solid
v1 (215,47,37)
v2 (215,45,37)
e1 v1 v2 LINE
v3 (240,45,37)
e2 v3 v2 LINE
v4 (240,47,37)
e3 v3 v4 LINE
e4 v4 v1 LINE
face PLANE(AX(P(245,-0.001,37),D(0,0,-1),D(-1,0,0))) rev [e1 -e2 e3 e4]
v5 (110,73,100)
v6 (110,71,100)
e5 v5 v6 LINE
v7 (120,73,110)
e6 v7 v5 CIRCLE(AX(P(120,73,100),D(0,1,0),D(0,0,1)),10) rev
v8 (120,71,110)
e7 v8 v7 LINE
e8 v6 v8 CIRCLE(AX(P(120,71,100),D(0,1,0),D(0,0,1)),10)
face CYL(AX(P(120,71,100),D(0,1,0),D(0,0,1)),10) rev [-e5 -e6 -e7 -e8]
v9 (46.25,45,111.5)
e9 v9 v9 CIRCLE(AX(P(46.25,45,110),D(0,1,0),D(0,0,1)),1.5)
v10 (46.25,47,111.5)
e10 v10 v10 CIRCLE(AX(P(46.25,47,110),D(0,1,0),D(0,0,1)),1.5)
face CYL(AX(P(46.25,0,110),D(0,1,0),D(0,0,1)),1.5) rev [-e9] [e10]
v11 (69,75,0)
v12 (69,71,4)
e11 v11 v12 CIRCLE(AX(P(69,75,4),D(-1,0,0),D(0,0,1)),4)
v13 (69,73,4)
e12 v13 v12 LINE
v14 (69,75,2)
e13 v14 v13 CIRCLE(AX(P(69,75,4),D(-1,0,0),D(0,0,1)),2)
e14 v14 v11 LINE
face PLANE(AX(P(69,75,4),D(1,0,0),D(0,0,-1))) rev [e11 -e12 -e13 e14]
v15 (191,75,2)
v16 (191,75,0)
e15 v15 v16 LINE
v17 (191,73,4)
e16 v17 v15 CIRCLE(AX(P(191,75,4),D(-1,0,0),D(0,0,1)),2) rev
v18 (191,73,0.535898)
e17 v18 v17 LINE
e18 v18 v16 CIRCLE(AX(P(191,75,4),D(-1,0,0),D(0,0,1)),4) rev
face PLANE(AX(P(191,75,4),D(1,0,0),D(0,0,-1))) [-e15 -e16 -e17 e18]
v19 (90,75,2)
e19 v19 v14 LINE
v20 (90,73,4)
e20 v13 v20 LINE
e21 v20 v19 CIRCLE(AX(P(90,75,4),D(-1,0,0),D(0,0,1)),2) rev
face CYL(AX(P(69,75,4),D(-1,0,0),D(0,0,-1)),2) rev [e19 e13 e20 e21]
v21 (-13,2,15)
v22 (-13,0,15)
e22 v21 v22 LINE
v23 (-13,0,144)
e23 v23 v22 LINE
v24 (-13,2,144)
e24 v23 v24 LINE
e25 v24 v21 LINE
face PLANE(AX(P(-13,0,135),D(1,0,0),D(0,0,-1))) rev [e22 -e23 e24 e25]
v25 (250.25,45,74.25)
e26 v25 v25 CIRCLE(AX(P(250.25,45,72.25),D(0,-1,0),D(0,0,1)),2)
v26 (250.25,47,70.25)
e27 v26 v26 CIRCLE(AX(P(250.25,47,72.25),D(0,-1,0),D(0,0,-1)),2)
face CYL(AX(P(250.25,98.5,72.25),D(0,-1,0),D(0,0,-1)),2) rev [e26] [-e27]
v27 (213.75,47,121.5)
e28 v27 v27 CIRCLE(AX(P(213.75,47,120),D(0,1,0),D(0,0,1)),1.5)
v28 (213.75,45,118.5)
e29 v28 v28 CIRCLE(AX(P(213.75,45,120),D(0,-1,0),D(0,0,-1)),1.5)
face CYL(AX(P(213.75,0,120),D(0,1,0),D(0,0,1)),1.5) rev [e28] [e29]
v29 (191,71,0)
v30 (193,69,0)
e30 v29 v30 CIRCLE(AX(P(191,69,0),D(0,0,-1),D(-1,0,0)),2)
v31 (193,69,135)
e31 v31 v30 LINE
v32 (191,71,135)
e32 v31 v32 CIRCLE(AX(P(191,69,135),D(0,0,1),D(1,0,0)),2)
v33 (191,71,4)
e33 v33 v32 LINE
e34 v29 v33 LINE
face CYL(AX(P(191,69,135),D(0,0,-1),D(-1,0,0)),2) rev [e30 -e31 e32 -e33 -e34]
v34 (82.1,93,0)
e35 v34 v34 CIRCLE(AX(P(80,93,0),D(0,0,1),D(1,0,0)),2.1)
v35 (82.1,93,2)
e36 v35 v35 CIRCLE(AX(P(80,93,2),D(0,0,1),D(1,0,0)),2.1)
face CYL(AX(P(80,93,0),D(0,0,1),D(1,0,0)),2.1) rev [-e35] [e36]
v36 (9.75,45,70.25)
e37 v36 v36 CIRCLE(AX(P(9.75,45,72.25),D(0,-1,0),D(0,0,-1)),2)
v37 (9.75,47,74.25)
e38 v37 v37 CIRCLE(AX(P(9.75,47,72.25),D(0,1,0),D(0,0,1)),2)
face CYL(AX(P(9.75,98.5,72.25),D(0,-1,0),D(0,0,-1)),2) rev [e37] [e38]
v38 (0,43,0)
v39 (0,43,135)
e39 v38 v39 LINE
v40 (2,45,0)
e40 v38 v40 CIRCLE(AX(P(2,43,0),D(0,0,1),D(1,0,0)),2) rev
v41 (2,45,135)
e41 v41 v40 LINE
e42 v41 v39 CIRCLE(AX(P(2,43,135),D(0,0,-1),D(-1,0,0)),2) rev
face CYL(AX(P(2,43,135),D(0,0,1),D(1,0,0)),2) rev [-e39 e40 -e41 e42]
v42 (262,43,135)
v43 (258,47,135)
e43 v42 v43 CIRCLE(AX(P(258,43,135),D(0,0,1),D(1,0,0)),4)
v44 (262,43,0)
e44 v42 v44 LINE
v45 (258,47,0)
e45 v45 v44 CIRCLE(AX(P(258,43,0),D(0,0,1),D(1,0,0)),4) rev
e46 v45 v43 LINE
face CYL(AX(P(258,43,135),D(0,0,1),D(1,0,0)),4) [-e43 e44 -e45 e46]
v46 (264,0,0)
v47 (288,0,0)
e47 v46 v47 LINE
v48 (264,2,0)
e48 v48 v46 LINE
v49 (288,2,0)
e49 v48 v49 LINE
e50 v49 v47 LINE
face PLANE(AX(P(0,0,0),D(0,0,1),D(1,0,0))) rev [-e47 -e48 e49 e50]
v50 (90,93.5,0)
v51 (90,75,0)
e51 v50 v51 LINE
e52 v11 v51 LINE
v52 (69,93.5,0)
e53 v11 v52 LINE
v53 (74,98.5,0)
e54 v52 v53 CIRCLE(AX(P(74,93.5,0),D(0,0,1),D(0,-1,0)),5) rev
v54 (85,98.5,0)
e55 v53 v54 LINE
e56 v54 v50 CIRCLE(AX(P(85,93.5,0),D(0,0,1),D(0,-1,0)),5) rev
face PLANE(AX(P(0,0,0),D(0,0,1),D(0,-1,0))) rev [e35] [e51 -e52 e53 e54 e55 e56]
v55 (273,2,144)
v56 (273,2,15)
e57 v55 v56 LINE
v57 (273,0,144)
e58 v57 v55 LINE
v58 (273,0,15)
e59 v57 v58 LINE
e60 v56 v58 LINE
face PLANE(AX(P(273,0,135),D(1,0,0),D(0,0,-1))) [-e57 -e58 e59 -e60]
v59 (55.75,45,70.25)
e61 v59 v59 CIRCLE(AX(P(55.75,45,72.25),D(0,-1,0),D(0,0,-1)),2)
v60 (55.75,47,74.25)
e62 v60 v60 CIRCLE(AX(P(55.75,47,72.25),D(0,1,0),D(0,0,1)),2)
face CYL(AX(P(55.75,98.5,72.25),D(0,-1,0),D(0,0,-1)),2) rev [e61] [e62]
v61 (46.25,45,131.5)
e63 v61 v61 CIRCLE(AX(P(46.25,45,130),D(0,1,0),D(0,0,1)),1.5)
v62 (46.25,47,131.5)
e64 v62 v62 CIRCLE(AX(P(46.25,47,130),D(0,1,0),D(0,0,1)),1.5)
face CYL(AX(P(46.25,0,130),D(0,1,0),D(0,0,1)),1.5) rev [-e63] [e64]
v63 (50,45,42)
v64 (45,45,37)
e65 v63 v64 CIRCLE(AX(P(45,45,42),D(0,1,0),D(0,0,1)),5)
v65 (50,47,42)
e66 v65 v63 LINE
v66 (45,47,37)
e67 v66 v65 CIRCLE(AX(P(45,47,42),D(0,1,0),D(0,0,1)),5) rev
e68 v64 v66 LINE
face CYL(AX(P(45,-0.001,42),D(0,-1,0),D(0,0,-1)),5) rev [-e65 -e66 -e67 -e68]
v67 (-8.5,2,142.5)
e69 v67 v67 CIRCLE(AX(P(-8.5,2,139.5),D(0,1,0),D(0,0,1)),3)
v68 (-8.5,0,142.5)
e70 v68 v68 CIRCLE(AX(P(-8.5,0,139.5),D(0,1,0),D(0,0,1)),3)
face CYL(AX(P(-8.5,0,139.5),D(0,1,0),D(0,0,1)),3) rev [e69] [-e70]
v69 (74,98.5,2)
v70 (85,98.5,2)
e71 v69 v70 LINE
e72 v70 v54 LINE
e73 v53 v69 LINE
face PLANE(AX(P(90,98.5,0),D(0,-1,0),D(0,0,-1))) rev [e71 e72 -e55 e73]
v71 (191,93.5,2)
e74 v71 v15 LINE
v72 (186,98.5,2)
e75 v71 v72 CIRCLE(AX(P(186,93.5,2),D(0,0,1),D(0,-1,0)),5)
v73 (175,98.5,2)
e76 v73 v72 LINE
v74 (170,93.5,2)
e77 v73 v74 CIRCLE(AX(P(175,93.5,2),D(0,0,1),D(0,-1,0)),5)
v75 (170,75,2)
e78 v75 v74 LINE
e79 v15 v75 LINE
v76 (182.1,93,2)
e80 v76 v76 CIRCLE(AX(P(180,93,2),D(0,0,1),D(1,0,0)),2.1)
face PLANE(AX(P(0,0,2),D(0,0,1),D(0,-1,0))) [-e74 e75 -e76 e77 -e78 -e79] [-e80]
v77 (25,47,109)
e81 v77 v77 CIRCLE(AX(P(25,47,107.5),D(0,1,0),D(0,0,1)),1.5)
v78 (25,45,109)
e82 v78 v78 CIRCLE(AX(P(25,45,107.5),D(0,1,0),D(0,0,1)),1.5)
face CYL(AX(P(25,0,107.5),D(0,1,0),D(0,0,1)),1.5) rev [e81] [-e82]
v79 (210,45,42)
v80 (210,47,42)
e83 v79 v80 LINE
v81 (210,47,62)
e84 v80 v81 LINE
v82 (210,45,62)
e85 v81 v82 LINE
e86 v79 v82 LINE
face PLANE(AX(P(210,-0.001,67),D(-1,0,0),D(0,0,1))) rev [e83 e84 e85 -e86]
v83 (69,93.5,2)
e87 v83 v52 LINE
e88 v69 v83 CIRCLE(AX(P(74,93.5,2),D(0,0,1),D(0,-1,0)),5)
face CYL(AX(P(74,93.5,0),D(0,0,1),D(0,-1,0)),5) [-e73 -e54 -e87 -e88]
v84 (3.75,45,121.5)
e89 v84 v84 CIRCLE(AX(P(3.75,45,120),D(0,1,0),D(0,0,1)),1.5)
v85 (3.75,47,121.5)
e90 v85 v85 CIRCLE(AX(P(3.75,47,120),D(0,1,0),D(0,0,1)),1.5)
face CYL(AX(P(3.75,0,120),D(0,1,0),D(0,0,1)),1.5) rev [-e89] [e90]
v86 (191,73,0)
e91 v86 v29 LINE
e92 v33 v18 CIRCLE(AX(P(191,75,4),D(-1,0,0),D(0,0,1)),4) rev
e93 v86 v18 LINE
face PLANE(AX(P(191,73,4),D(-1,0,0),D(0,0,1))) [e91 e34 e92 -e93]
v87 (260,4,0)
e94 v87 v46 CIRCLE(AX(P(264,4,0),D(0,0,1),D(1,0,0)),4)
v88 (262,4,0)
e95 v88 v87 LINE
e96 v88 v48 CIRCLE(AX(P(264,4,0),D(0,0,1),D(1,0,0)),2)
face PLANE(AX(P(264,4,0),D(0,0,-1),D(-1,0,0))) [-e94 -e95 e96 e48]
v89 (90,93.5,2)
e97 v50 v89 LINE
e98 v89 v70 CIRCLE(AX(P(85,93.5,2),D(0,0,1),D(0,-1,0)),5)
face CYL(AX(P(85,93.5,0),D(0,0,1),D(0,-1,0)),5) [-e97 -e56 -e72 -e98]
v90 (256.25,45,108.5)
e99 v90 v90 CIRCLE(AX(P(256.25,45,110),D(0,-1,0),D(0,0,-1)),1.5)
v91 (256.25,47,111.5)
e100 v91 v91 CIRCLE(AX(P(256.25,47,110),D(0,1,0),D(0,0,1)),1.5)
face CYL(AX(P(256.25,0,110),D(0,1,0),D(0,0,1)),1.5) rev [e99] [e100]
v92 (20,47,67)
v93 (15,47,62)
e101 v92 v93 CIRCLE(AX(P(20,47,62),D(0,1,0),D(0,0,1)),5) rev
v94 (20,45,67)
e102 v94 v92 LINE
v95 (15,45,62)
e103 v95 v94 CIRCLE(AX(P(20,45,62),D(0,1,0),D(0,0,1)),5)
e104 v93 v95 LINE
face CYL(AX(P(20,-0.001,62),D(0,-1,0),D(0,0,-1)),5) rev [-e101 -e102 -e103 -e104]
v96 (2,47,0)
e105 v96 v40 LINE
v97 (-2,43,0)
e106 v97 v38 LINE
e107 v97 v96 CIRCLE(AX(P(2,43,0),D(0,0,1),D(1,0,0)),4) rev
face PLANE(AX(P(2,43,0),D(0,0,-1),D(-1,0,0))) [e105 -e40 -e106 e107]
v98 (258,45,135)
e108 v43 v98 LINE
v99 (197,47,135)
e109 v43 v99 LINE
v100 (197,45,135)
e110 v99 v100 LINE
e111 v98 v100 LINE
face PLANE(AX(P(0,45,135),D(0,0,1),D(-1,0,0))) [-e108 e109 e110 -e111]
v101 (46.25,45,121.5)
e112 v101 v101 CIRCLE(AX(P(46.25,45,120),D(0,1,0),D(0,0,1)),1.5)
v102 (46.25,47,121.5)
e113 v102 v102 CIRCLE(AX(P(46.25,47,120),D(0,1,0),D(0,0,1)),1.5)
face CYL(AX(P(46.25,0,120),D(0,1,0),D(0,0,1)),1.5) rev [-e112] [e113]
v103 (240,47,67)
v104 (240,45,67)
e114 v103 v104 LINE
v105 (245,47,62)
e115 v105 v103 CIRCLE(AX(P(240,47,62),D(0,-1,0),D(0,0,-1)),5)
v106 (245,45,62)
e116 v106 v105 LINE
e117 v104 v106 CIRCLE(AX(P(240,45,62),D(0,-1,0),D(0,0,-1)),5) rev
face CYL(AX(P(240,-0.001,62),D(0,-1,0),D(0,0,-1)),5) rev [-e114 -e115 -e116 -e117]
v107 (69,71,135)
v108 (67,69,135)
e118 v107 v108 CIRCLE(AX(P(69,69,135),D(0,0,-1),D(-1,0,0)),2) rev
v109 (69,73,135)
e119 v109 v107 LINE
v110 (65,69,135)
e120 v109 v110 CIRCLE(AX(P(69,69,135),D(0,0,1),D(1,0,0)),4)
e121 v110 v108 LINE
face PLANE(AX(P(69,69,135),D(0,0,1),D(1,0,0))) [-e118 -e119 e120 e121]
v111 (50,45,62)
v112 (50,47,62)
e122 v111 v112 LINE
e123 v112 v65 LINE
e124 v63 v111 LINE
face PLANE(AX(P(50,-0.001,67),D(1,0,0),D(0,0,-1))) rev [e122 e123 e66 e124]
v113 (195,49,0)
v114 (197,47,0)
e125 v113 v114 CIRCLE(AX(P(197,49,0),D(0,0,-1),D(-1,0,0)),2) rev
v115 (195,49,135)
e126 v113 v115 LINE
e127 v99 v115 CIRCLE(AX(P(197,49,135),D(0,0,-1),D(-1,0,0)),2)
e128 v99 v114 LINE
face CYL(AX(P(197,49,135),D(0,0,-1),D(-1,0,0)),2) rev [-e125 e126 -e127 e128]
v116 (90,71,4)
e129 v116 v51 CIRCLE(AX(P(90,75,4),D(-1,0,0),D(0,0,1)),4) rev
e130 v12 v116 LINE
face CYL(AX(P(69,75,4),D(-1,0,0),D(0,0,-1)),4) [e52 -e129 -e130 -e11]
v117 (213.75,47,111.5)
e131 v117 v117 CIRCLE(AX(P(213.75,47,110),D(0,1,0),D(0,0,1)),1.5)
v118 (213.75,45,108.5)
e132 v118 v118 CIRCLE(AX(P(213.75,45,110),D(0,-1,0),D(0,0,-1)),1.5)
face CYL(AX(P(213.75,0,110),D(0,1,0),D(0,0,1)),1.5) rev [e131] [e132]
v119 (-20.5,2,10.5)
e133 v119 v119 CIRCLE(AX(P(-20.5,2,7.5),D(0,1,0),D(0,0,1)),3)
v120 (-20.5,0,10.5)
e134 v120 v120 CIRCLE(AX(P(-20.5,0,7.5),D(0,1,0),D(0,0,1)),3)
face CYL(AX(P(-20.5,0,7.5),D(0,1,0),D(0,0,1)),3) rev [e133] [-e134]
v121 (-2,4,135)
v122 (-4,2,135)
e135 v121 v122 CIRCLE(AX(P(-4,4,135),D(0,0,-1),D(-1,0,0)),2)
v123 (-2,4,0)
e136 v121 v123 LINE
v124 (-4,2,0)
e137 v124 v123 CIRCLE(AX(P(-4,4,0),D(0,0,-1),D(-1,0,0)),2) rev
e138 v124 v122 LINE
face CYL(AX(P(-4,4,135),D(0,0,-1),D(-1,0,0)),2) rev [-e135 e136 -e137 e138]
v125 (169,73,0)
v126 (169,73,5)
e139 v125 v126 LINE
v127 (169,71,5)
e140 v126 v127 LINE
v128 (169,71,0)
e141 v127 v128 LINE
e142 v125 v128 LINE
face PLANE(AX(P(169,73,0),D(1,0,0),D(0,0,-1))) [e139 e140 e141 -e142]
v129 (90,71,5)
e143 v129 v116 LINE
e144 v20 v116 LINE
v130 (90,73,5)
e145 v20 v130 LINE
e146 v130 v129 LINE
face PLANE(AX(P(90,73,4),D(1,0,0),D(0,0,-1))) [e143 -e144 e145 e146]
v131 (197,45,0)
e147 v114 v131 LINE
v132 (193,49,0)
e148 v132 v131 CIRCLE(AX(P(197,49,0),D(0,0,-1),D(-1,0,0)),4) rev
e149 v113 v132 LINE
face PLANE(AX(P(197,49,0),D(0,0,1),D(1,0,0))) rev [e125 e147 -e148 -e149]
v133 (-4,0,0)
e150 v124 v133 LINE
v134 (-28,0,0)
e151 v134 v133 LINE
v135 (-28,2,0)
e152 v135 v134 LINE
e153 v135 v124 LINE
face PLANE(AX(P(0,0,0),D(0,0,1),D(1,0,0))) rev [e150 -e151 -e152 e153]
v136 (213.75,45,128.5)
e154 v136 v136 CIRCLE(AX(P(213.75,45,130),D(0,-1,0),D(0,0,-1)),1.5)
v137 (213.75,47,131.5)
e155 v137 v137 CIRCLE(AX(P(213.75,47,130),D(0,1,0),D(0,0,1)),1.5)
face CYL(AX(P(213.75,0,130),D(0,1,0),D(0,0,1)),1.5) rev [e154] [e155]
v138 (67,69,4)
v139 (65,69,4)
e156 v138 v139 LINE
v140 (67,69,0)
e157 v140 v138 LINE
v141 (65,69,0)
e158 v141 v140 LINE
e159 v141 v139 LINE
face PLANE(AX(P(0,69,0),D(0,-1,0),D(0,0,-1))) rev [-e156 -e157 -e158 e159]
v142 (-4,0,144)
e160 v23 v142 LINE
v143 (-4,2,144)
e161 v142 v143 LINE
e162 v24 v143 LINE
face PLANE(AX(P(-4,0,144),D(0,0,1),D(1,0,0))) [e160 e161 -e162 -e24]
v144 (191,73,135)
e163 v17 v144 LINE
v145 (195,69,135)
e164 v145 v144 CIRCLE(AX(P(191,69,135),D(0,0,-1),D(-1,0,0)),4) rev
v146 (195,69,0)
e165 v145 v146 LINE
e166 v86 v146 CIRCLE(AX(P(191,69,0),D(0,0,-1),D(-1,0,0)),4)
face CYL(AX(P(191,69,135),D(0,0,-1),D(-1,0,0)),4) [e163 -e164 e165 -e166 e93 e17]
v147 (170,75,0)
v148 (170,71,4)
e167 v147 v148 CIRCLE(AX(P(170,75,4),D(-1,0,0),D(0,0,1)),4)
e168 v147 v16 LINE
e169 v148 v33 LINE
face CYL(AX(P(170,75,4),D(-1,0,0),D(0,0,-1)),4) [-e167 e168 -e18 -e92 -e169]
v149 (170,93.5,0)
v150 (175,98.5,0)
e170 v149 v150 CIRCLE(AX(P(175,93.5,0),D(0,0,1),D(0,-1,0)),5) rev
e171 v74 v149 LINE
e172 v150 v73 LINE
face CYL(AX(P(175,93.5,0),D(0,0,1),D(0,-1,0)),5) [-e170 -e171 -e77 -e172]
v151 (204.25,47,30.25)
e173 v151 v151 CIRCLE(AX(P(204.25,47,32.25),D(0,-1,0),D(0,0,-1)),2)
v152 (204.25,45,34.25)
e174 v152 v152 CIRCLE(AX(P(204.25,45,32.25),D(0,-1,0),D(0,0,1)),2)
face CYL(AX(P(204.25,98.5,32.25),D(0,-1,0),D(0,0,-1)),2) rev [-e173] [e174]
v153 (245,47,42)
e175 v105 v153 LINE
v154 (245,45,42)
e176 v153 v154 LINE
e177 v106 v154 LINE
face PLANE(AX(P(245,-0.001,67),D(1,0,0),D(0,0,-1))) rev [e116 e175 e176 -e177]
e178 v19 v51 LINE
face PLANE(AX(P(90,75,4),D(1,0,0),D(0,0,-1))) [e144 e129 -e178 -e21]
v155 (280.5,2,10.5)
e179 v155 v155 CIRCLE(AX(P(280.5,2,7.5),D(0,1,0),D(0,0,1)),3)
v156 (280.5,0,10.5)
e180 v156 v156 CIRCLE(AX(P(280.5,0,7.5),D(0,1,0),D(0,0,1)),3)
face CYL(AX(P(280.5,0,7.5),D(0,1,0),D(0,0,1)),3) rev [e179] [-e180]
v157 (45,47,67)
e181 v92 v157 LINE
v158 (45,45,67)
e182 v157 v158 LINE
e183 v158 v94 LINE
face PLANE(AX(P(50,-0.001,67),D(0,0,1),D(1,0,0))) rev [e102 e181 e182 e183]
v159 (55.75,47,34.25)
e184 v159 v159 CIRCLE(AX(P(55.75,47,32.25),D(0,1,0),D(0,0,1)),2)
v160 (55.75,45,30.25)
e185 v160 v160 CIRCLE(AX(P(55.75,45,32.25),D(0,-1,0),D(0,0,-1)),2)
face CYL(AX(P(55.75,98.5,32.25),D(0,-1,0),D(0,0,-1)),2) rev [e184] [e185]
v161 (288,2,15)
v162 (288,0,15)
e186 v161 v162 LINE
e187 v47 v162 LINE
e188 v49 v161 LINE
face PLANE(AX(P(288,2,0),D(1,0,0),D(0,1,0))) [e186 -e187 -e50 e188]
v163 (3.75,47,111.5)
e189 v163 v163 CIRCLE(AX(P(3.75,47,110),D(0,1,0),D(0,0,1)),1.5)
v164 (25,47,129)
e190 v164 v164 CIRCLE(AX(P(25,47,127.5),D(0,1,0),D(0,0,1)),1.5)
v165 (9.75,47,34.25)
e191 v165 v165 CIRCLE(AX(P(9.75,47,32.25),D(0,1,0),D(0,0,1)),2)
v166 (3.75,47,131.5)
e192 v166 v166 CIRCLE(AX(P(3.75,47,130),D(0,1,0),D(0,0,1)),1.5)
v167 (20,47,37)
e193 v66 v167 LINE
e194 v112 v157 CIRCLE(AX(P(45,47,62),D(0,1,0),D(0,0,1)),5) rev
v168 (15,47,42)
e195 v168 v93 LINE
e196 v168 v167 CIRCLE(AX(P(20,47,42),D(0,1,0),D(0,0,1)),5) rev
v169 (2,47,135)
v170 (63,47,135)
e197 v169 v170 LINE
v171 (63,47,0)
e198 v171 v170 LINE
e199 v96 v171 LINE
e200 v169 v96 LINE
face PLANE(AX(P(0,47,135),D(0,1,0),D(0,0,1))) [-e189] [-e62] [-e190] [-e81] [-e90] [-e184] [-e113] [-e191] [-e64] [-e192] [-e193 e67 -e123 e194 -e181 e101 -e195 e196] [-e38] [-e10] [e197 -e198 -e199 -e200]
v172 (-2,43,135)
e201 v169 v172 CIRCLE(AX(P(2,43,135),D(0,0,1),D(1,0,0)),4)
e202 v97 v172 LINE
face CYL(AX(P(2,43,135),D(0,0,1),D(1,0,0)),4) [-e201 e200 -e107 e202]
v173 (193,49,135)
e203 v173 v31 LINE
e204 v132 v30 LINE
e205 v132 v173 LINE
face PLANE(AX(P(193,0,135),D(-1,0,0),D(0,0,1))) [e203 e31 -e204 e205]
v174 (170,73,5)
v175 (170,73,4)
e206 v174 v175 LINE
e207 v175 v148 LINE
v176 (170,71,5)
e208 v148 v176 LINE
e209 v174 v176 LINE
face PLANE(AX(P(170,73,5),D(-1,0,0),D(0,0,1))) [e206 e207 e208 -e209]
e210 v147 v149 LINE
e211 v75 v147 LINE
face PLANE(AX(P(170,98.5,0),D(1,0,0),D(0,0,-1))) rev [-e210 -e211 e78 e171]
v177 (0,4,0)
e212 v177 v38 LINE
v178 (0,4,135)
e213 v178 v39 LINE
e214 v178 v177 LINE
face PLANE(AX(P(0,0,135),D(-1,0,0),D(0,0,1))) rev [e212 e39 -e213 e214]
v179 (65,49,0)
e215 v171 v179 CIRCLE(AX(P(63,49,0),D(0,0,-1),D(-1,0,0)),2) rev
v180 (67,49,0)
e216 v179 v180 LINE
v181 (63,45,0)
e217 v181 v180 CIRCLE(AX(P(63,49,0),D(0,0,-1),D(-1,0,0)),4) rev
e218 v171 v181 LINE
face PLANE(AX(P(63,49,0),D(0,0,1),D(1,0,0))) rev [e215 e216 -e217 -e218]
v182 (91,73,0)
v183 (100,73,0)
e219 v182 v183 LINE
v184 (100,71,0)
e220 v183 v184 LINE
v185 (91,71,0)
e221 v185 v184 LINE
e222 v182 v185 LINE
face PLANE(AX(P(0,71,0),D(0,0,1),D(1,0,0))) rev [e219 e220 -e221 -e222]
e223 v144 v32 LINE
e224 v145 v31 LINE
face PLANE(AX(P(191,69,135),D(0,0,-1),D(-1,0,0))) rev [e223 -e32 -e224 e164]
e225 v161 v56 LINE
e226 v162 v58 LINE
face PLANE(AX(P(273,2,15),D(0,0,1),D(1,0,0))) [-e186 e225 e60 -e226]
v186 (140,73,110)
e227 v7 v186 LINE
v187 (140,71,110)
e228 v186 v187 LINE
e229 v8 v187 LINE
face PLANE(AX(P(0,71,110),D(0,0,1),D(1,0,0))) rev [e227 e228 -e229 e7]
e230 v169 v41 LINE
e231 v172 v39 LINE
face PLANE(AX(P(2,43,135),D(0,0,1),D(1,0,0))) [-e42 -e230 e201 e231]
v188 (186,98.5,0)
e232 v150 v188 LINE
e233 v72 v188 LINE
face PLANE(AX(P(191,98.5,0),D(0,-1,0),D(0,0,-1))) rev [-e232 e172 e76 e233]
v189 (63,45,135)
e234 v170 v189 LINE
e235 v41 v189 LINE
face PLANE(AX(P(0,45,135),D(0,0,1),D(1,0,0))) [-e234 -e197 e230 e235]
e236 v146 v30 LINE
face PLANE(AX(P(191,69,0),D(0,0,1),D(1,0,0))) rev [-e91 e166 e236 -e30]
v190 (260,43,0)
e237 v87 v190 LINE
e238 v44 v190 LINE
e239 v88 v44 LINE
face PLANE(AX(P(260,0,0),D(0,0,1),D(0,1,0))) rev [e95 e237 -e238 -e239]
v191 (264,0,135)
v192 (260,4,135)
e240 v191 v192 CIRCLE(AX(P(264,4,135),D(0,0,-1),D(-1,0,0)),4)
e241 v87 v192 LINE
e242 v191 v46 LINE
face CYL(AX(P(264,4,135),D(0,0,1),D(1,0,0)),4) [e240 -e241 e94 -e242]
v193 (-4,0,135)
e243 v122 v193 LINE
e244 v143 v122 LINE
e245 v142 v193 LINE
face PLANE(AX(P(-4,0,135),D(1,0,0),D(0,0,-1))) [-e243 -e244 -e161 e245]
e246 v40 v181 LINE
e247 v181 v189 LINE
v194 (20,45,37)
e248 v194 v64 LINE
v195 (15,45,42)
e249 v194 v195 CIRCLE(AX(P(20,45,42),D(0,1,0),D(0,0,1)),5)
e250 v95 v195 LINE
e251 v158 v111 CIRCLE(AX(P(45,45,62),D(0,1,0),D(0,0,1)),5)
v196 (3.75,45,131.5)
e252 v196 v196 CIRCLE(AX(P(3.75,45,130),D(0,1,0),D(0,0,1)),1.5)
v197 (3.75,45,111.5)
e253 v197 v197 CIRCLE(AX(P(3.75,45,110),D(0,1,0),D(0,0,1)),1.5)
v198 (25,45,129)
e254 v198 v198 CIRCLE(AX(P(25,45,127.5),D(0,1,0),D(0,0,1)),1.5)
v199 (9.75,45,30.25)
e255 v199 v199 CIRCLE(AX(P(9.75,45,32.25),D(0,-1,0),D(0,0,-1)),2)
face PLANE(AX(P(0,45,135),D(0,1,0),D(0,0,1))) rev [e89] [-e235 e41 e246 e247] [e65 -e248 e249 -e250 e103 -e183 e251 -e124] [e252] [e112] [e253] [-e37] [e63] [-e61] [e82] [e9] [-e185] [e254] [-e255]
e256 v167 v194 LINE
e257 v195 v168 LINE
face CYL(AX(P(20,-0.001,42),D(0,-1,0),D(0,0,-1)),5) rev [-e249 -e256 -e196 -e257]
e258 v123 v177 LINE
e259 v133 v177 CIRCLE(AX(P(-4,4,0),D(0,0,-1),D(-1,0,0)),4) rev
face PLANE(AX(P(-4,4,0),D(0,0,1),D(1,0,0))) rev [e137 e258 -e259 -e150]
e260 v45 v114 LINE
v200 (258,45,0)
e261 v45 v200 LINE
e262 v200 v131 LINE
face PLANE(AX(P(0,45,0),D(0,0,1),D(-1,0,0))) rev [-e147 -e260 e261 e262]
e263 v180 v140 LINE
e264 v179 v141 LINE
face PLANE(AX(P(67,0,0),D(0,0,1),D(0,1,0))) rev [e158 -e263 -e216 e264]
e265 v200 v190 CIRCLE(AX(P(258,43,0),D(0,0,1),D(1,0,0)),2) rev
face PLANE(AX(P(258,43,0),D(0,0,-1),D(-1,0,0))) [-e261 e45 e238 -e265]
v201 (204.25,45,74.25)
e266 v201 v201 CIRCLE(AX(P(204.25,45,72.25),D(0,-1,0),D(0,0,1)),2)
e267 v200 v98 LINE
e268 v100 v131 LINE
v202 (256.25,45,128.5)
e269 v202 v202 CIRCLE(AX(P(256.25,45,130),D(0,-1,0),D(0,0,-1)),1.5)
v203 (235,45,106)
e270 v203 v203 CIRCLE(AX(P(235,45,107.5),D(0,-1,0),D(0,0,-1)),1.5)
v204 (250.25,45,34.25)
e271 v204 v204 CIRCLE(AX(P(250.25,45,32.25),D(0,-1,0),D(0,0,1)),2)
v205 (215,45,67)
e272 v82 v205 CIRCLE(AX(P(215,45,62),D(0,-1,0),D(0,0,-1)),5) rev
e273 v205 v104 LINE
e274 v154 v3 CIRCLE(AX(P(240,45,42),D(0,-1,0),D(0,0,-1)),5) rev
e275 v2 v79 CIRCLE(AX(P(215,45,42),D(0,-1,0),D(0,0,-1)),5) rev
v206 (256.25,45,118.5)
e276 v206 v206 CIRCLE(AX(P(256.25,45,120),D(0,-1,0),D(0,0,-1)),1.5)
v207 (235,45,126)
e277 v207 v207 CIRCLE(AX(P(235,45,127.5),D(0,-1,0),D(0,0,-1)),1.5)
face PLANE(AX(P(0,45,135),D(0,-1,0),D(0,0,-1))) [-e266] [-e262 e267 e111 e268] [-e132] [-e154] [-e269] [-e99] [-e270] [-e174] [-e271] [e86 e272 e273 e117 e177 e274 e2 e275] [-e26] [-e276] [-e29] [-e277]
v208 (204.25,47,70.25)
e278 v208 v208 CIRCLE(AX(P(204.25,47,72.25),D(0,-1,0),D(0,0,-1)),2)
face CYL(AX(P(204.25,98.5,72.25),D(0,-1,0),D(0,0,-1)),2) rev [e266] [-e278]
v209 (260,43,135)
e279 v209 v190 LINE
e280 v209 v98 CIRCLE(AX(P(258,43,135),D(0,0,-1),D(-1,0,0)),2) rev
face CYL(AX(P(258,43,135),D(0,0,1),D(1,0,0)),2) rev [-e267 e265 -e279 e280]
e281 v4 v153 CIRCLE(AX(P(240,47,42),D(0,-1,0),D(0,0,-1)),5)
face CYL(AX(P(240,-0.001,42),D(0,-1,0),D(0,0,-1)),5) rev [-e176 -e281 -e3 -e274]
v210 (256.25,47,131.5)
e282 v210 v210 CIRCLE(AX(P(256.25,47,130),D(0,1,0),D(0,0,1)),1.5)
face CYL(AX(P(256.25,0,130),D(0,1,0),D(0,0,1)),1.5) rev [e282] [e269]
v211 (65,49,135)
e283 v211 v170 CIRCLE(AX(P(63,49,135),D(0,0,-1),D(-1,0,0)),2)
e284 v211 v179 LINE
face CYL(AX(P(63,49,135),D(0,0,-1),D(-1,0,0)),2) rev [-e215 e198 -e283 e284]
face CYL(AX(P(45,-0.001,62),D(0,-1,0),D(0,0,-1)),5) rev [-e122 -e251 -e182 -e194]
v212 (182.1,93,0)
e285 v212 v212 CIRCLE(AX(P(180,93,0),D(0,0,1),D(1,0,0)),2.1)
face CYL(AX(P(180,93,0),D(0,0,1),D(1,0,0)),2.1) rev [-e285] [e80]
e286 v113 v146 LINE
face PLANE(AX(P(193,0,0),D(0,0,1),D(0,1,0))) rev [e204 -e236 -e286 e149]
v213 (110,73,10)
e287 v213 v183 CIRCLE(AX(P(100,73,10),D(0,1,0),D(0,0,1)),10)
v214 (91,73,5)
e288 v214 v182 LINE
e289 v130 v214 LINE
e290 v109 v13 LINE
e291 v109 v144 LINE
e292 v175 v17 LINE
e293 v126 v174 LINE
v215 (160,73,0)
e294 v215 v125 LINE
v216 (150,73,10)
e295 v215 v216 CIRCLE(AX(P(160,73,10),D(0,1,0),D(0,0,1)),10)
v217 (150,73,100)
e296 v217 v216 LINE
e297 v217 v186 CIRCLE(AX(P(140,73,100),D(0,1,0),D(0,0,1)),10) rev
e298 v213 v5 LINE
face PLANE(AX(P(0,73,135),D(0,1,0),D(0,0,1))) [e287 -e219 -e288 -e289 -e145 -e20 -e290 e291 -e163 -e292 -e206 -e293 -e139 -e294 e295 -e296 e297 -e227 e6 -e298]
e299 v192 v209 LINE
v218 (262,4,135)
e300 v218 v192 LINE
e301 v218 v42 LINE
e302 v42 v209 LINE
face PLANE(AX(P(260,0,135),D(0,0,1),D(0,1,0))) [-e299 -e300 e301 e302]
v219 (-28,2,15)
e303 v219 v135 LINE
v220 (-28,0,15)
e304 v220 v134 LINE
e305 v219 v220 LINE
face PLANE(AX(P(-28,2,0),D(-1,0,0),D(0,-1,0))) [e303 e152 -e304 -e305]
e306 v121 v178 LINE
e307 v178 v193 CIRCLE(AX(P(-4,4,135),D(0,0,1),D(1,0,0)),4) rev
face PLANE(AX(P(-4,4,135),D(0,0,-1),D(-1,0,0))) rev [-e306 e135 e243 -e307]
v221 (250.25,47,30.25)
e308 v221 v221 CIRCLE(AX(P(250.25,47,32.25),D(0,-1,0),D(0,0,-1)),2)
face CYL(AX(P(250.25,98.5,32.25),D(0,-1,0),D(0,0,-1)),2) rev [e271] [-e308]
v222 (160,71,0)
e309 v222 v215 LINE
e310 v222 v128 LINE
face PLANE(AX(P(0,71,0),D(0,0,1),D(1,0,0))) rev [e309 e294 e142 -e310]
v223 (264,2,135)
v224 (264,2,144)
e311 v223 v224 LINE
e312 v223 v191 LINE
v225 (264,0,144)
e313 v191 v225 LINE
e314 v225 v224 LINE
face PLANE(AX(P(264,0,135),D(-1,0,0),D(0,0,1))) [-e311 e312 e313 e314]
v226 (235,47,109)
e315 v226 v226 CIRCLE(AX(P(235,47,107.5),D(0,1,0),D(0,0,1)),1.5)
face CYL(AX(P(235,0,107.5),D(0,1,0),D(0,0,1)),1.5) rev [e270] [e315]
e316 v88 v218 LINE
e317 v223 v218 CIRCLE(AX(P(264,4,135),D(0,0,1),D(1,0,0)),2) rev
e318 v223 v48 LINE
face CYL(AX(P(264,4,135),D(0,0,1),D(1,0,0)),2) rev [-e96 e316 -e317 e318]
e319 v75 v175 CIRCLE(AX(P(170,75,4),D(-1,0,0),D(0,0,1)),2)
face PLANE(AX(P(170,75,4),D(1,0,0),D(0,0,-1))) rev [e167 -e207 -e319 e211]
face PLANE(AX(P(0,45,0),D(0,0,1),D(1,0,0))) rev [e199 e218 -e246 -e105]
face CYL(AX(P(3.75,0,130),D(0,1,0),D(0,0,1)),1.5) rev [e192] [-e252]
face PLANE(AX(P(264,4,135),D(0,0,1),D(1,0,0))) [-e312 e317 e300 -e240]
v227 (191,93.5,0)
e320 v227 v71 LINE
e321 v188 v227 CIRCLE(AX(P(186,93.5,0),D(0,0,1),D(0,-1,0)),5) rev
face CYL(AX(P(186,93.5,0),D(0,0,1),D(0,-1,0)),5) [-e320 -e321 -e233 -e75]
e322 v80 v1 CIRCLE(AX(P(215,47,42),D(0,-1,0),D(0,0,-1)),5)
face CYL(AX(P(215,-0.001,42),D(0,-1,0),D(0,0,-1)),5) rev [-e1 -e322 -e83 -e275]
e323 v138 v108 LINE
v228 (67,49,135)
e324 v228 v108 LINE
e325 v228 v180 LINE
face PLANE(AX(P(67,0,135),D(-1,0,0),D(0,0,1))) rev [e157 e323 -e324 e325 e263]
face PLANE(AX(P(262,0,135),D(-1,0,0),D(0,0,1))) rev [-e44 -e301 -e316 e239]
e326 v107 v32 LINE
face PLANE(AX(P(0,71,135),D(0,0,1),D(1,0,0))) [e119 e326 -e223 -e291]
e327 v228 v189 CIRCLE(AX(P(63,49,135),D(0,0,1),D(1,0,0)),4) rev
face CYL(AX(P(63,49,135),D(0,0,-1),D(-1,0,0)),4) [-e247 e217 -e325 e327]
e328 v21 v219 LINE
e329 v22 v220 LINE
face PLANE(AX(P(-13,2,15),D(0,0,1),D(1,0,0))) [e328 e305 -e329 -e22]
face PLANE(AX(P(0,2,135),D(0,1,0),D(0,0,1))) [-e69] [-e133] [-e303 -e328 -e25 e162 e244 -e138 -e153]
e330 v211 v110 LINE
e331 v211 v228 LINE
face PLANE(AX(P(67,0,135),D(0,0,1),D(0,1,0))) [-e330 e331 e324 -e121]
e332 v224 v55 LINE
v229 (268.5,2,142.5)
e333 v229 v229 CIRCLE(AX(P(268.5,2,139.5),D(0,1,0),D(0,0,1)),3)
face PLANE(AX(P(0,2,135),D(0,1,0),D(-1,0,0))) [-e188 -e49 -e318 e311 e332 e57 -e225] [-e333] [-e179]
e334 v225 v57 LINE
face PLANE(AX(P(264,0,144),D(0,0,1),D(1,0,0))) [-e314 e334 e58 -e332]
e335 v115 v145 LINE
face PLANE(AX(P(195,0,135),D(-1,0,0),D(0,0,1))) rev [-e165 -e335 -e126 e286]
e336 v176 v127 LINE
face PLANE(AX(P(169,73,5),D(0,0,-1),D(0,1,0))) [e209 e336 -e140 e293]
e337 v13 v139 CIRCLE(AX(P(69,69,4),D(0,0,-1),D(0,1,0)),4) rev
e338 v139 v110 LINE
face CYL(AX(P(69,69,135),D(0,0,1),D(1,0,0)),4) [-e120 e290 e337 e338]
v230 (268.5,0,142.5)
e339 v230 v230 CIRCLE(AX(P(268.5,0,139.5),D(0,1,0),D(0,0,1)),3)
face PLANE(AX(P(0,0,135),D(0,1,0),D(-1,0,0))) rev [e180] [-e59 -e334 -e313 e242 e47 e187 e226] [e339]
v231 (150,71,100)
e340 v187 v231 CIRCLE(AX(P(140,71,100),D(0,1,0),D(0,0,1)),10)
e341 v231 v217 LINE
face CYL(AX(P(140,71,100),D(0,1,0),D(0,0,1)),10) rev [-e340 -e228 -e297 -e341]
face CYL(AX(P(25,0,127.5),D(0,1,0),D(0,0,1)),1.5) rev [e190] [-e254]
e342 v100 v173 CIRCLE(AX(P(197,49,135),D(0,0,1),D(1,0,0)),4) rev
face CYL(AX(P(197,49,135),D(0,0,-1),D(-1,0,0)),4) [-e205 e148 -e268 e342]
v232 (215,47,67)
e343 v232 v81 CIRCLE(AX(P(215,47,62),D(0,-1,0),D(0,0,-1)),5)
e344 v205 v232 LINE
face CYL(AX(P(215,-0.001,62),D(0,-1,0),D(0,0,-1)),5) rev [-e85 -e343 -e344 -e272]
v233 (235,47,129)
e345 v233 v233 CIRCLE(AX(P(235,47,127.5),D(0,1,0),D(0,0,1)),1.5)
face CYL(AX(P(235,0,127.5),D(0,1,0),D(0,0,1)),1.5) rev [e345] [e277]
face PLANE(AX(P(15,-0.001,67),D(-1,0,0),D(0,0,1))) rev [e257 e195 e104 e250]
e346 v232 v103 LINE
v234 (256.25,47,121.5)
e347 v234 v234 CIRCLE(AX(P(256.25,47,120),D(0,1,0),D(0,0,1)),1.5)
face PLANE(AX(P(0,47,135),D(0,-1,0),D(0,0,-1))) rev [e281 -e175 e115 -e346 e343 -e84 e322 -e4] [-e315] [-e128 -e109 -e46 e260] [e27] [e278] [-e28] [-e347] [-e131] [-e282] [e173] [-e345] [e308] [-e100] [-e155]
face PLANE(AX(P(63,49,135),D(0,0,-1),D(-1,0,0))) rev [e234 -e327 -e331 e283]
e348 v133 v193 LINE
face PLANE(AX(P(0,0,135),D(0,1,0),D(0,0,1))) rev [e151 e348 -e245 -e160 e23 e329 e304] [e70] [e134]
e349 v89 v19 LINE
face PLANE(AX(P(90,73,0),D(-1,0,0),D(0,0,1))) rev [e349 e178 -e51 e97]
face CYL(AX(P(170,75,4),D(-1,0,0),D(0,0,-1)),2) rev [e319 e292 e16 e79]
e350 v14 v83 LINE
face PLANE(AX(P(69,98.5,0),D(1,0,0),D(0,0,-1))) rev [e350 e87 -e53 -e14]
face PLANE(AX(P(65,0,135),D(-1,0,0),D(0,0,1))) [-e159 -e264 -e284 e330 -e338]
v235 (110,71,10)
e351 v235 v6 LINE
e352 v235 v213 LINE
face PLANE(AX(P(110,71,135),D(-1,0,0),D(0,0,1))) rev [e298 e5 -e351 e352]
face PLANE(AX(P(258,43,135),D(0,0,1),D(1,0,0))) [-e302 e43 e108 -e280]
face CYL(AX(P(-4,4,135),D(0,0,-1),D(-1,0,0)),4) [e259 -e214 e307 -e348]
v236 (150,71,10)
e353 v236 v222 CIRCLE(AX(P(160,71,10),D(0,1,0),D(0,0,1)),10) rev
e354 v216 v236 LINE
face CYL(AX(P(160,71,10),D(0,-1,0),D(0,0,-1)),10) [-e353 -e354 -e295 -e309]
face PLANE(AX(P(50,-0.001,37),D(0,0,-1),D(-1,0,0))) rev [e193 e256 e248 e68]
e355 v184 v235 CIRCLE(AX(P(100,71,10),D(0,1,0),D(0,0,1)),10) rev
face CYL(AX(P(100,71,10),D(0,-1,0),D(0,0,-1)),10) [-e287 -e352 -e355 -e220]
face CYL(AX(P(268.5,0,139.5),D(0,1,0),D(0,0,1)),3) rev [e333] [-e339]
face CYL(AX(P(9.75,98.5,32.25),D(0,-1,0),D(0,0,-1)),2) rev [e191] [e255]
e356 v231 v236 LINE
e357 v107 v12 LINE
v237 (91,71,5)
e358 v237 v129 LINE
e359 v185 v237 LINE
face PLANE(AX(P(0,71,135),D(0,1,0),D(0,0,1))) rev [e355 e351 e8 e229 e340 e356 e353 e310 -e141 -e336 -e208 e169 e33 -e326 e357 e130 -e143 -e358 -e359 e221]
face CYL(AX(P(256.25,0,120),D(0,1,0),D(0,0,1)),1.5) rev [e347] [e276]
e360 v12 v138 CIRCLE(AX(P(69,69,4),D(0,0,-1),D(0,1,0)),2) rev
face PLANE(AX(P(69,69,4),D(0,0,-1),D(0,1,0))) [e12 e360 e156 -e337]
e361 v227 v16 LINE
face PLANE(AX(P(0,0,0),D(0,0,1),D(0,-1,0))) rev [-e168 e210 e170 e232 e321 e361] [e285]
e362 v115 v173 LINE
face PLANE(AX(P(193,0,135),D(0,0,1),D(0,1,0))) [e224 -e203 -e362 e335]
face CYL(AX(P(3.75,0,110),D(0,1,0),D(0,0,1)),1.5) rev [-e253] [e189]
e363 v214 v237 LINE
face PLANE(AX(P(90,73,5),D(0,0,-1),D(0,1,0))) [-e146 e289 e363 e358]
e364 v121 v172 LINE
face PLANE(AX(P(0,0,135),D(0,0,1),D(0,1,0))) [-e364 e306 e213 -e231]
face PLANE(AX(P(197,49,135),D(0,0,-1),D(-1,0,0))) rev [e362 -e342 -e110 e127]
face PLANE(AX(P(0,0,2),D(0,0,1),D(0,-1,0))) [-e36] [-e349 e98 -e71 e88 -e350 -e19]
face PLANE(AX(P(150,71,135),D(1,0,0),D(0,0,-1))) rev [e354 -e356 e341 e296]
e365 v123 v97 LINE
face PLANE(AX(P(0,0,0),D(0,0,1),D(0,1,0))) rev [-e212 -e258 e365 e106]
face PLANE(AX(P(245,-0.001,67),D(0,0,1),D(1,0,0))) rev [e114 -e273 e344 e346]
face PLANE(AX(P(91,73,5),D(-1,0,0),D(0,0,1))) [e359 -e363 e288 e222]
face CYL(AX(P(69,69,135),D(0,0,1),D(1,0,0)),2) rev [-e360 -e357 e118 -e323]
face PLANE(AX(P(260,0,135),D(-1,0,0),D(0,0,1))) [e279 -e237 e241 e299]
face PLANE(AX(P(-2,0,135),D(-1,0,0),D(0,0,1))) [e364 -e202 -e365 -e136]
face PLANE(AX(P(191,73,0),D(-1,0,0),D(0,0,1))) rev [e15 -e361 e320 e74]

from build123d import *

# Parameters (mm, degrees)
SKETCH_1_W               = 10
SKETCH_1_H               = 3
EXTRUDE_1_DEPTH          = 135
SKETCH_2_W               = 40
SKETCH_2_H               = 124.505736859
CUT_EXTRUDE_1_DEPTH      = 314.416655588
SHEET_METAL_1_DEPTH      = 135
SHEET_METAL_1_2_DEPTH    = 135
FILLET_1_R               = 10
SKETCH_7_W               = 15
SKETCH_7_H               = 15
EXTRUDE_2_DEPTH          = 2
SKETCH_9_R               = 3
CUT_EXTRUDE_2_DEPTH      = 326.898757285
SKETCH_10_R              = 1.5
CUT_EXTRUDE_3_DEPTH      = 322.524493624
SKETCH_11_W              = 9
SKETCH_11_H              = 9
SKETCH_11_R              = 3
EXTRUDE_3_DEPTH          = 2
SM_START                 = 65
SM_EDGE_FLANGE_1_DEPTH   = 26
SM_EDGE_FLANGE_1_2_DEPTH = 4
SM_START_2               = 90
SM_EDGE_FLANGE_1_3_DEPTH = 1
SM_START_3               = 69
SM_EDGE_FLANGE_1_4_DEPTH = 21
SM_START_4               = 169
SM_EDGE_FLANGE_2_DEPTH   = 22
SM_EDGE_FLANGE_2_2_DEPTH = 1
SM_START_5               = 170
SM_EDGE_FLANGE_2_3_DEPTH = 21
SKETCH_18_R              = 2.1
CUT_EXTRUDE_4_DEPTH      = 336.872371594
SKETCH_19_R              = 2
CUT_EXTRUDE_5_DEPTH      = 327.408103453
CUT_EXTRUDE_6_REACH      = 328.086
SKETCH_20_W              = 35
SKETCH_20_H              = 30
FILLET_2_R               = 5
FILLET_3_R               = 5


# Read off the part's stored shape, not the designer's step: Преобразовать-Твердое тело1, Ребро-кромка1, Ребро-кромка2
with BuildPart() as part:
    # Sketch 1 → Бобышка-Вытянуть1 (new body)
    with BuildSketch(Plane.XY):
        Polygon((-3, 0), (0, 0), (0, 45), (67, 45), (67, 71), (110, 71), (130, 71), (130, 74), (110, 74), (64, 74), (64, 48), (-3, 48), (-3, 3), align=None)
        Polygon((130, 74), (130, 71), (150, 71), (193, 71), (193, 45), (260, 45), (260, 0), (263, 0), (273, 0), (273, 5), (263, 5), (263, 48), (196, 48), (196, 74), (150, 74), align=None)
        with Locations((-8, 1.5)):
            Rectangle(SKETCH_1_W, SKETCH_1_H)
    extrude(amount=EXTRUDE_1_DEPTH)

    # Sketch 2 → Вырез-Вытянуть1 (cut, through all)
    with BuildSketch(Plane(origin=(0, 74, 0), x_dir=(1, 0, 0), z_dir=(0, 1, 0))):
        with Locations((130, -47.747131571)):
            Rectangle(SKETCH_2_W, SKETCH_2_H)
    extrude(amount=-CUT_EXTRUDE_1_DEPTH, mode=Mode.SUBTRACT)

    # Sheet Metal 1 outline → Sheet Metal 1 (cut)
    with BuildSketch(Plane.XY):
        with BuildLine():
            ThreePointArc((264, 0), (261.171572875, 1.171572875), (260, 4))
            Line((260, 4), (260, 0))
            Line((260, 0), (264, 0))
        make_face()
        with BuildLine():
            Line((264, 2), (273, 2))
            Line((273, 2), (273, 5))
            Line((273, 5), (263, 5))
            Line((263, 5), (263, 48))
            Line((263, 48), (196, 48))
            Line((196, 48), (196, 74))
            Line((196, 74), (64, 74))
            Line((64, 74), (64, 48))
            Line((64, 48), (-3, 48))
            Line((-3, 48), (-3, 3))
            Line((-3, 3), (-13, 3))
            Line((-13, 3), (-13, 2))
            Line((-13, 2), (-4, 2))
            ThreePointArc((-4, 2), (-2.585786438, 2.585786438), (-2, 4))
            Line((-2, 4), (-2, 43))
            ThreePointArc((-2, 43), (-0.828427125, 45.828427125), (2, 47))
            Line((2, 47), (63, 47))
            ThreePointArc((63, 47), (64.414213562, 47.585786438), (65, 49))
            Line((65, 49), (65, 69))
            ThreePointArc((65, 69), (66.171572875, 71.828427125), (69, 73))
            Line((69, 73), (191, 73))
            ThreePointArc((191, 73), (193.828427125, 71.828427125), (195, 69))
            Line((195, 69), (195, 49))
            ThreePointArc((195, 49), (195.585786438, 47.585786438), (197, 47))
            Line((197, 47), (258, 47))
            ThreePointArc((258, 47), (260.828427125, 45.828427125), (262, 43))
            Line((262, 43), (262, 4))
            ThreePointArc((262, 4), (262.585786438, 2.585786438), (264, 2))
        make_face()
        with BuildLine():
            Line((193, 45), (197, 45))
            ThreePointArc((197, 45), (194.171572875, 46.171572875), (193, 49))
            Line((193, 49), (193, 45))
        make_face()
        with BuildLine():
            Line((67, 45), (67, 49))
            ThreePointArc((67, 49), (65.828427125, 46.171572875), (63, 45))
            Line((63, 45), (67, 45))
        make_face()
        with BuildLine():
            Line((0, 0), (0, 4))
            ThreePointArc((0, 4), (-1.171572875, 1.171572875), (-4, 0))
            Line((-4, 0), (0, 0))
        make_face()
    extrude(amount=SHEET_METAL_1_DEPTH, mode=Mode.SUBTRACT)

    # Sheet Metal 1 2 outline → Sheet Metal 1 2 (add)
    with BuildSketch(Plane.XY):
        with BuildLine():
            ThreePointArc((258, 45), (259.414213562, 44.414213562), (260, 43))
            Line((260, 43), (260, 45))
            Line((260, 45), (258, 45))
        make_face()
        with BuildLine():
            ThreePointArc((191, 71), (192.414213562, 70.414213562), (193, 69))
            Line((193, 69), (193, 71))
            Line((193, 71), (191, 71))
        make_face()
        with BuildLine():
            ThreePointArc((67, 69), (67.585786438, 70.414213562), (69, 71))
            Line((69, 71), (67, 71))
            Line((67, 71), (67, 69))
        make_face()
        with BuildLine():
            ThreePointArc((0, 43), (0.585786438, 44.414213562), (2, 45))
            Line((2, 45), (0, 45))
            Line((0, 45), (0, 43))
        make_face()
    extrude(amount=SHEET_METAL_1_2_DEPTH)

    # Скругление1
    fillet_1_edges = [part.edges().sort_by_distance(p)[0] for p in [
        (150, 72, 0),
        (150, 72, 110),
        (110, 72, 110),
        (110, 72, 0),
    ]]
    fillet(fillet_1_edges, radius=FILLET_1_R)

    # Эскиз7 → Бобышка-Вытянуть2 (add)
    with BuildSketch(Plane.XZ):
        with Locations((-20.5, 7.5)):
            Rectangle(SKETCH_7_W, SKETCH_7_H)
        with Locations((280.5, 7.5)):
            Rectangle(SKETCH_7_W, SKETCH_7_H)
    extrude(amount=-EXTRUDE_2_DEPTH)

    # Эскиз9 → Вырез-Вытянуть2 (cut, through all)
    with BuildSketch(Plane(origin=(0, 2, 0), x_dir=(1, 0, 0), z_dir=(0, 1, 0))):
        with Locations(Location((280.5, -7.5, 0), (0, 0, 270))):
            Circle(SKETCH_9_R)
        with Locations(Location((-20.5, -7.5, 0), (0, 0, 270))):
            Circle(SKETCH_9_R)
    extrude(amount=-CUT_EXTRUDE_2_DEPTH, mode=Mode.SUBTRACT)

    # Эскиз10 → Вырез-Вытянуть3 (cut, through all)
    with BuildSketch(Plane(origin=(0, 47, 0), x_dir=(1, 0, 0), z_dir=(0, 1, 0))):
        with Locations(Location((3.75, -130, 0), (0, 0, 270))):
            Circle(SKETCH_10_R)
        with Locations(Location((3.75, -120, 0), (0, 0, 270))):
            Circle(SKETCH_10_R)
        with Locations(Location((3.75, -110, 0), (0, 0, 270))):
            Circle(SKETCH_10_R)
        with Locations(Location((25, -107.5, 0), (0, 0, 270))):
            Circle(SKETCH_10_R)
        with Locations(Location((25, -127.5, 0), (0, 0, 270))):
            Circle(SKETCH_10_R)
        with Locations(Location((46.25, -130, 0), (0, 0, 270))):
            Circle(SKETCH_10_R)
        with Locations(Location((46.25, -120, 0), (0, 0, 270))):
            Circle(SKETCH_10_R)
        with Locations(Location((46.25, -110, 0), (0, 0, 270))):
            Circle(SKETCH_10_R)
        with Locations(Location((213.75, -130, 0), (0, 0, 270))):
            Circle(SKETCH_10_R)
        with Locations(Location((213.75, -120, 0), (0, 0, 270))):
            Circle(SKETCH_10_R)
        with Locations(Location((213.75, -110, 0), (0, 0, 270))):
            Circle(SKETCH_10_R)
        with Locations(Location((235, -107.5, 0), (0, 0, 270))):
            Circle(SKETCH_10_R)
        with Locations(Location((235, -127.5, 0), (0, 0, 270))):
            Circle(SKETCH_10_R)
        with Locations(Location((256.25, -130, 0), (0, 0, 270))):
            Circle(SKETCH_10_R)
        with Locations(Location((256.25, -120, 0), (0, 0, 270))):
            Circle(SKETCH_10_R)
        with Locations(Location((256.25, -110, 0), (0, 0, 270))):
            Circle(SKETCH_10_R)
    extrude(amount=-CUT_EXTRUDE_3_DEPTH, mode=Mode.SUBTRACT)

    # Эскиз11 → Бобышка-Вытянуть3 (add)
    # profile 1 of 2: a face of its own
    with BuildSketch(Plane(origin=(0, 2, 0), x_dir=(1, 0, 0), z_dir=(0, 1, 0))):
        with Locations((-8.5, -139.5)):
            Rectangle(SKETCH_11_W, SKETCH_11_H)
        with Locations(Location((-8.5, -139.5, 0), (0, 0, 270))):
            Circle(SKETCH_11_R, mode=Mode.SUBTRACT)
    # profile 2 of 2: a face of its own
    with BuildSketch(Plane(origin=(0, 2, 0), x_dir=(1, 0, 0), z_dir=(0, 1, 0))):
        with Locations((268.5, -139.5)):
            Rectangle(SKETCH_11_W, SKETCH_11_H)
        with Locations(Location((268.5, -139.5, 0), (0, 0, 270))):
            Circle(SKETCH_11_R, mode=Mode.SUBTRACT)
    extrude(amount=-EXTRUDE_3_DEPTH)

    # Ребро-кромка1 outline → Ребро-кромка1 (cut)
    with BuildSketch(Plane.YZ.offset(SM_START)):
        with BuildLine():
            Line((71, 4), (69, 4))
            Line((69, 4), (69, 0))
            Line((69, 0), (73, 0))
            Line((73, 0), (73, 0.535898384))
            ThreePointArc((73, 0.535898384), (71.535898385, 2), (71, 4))
        make_face()
    extrude(amount=SM_EDGE_FLANGE_1_DEPTH, mode=Mode.SUBTRACT)

    # Sm Edge Flange 1 2 outline → Sm Edge Flange 1 2 (cut)
    with BuildSketch(Plane.YZ.offset(SM_START)):
        with BuildLine():
            Line((73, 4), (71, 4))
            ThreePointArc((71, 4), (71.535898385, 2), (73, 0.535898384))
            Line((73, 0.535898384), (73, 4))
        make_face()
    extrude(amount=SM_EDGE_FLANGE_1_2_DEPTH, mode=Mode.SUBTRACT)

    # Sm Edge Flange 1 3 outline → Sm Edge Flange 1 3 (cut)
    with BuildSketch(Plane.YZ.offset(SM_START_2)):
        with BuildLine():
            Line((71, 5), (71, 4))
            ThreePointArc((71, 4), (71.535898385, 2), (73, 0.535898384))
            Line((73, 0.535898384), (73, 5))
            Line((73, 5), (71, 5))
        make_face()
    extrude(amount=SM_EDGE_FLANGE_1_3_DEPTH, mode=Mode.SUBTRACT)

    # Sm Edge Flange 1 4 outline → Sm Edge Flange 1 4 (add)
    with BuildSketch(Plane.YZ.offset(SM_START_3)):
        with BuildLine():
            ThreePointArc((75, 2), (73.585786438, 2.585786438), (73, 4))
            Line((73, 4), (73, 0.535898384))
            ThreePointArc((73, 0.535898384), (73.96472382, 0.136296695), (75, 0))
            Line((75, 0), (98.5, 0))
            Line((98.5, 0), (98.5, 2))
            Line((98.5, 2), (75, 2))
        make_face()
    extrude(amount=SM_EDGE_FLANGE_1_4_DEPTH)

    # Ребро-кромка2 outline → Ребро-кромка2 (cut)
    with BuildSketch(Plane.YZ.offset(SM_START_4)):
        with BuildLine():
            Line((73, 0), (73, 0.535898384))
            ThreePointArc((73, 0.535898384), (71.535898385, 2), (71, 4))
            Line((71, 4), (71, 0))
            Line((71, 0), (73, 0))
        make_face()
    extrude(amount=SM_EDGE_FLANGE_2_DEPTH, mode=Mode.SUBTRACT)

    # Sm Edge Flange 2 2 outline → Sm Edge Flange 2 2 (cut)
    with BuildSketch(Plane.YZ.offset(SM_START_4)):
        with BuildLine():
            ThreePointArc((71, 4), (71.535898385, 2), (73, 0.535898384))
            Line((73, 0.535898384), (73, 5))
            Line((73, 5), (71, 5))
            Line((71, 5), (71, 4))
        make_face()
    extrude(amount=SM_EDGE_FLANGE_2_2_DEPTH, mode=Mode.SUBTRACT)

    # Sm Edge Flange 2 3 outline → Sm Edge Flange 2 3 (add)
    with BuildSketch(Plane.YZ.offset(SM_START_5)):
        with BuildLine():
            Line((75, 0), (98.5, 0))
            Line((98.5, 0), (98.5, 2))
            Line((98.5, 2), (75, 2))
            ThreePointArc((75, 2), (73.585786438, 2.585786438), (73, 4))
            Line((73, 4), (73, 0.535898384))
            ThreePointArc((73, 0.535898384), (73.96472382, 0.136296695), (75, 0))
        make_face()
    extrude(amount=SM_EDGE_FLANGE_2_3_DEPTH)

    # Эскиз18 → Вырез-Вытянуть4 (cut, through all)
    with BuildSketch(Plane.XY.offset(2)):
        with Locations((80, 93)):
            Circle(SKETCH_18_R)
        with Locations((180, 93)):
            Circle(SKETCH_18_R)
    extrude(amount=-CUT_EXTRUDE_4_DEPTH, mode=Mode.SUBTRACT)

    # Эскиз19 → Вырез-Вытянуть5 (cut, through all)
    with BuildSketch(Plane.XZ.offset(-45)):
        with Locations(Location((9.75, 72.25, 0), (0, 0, 270))):
            Circle(SKETCH_19_R)
        with Locations(Location((55.75, 72.25, 0), (0, 0, 270))):
            Circle(SKETCH_19_R)
        with Locations(Location((9.75, 32.25, 0), (0, 0, 270))):
            Circle(SKETCH_19_R)
        with Locations(Location((55.75, 32.25, 0), (0, 0, 270))):
            Circle(SKETCH_19_R)
        with Locations(Location((204.25, 32.25, 0), (0, 0, 270))):
            Circle(SKETCH_19_R)
        with Locations(Location((250.25, 32.25, 0), (0, 0, 270))):
            Circle(SKETCH_19_R)
        with Locations(Location((204.25, 72.25, 0), (0, 0, 270))):
            Circle(SKETCH_19_R)
        with Locations(Location((250.25, 72.25, 0), (0, 0, 270))):
            Circle(SKETCH_19_R)
    extrude(amount=-CUT_EXTRUDE_5_DEPTH, mode=Mode.SUBTRACT)

    # Эскиз20 → Вырез-Вытянуть6 (cut, up to next)
    with BuildSketch(Plane(origin=(0, 47, 0), x_dir=(1, 0, 0), z_dir=(0, 1, 0)), mode=Mode.PRIVATE) as cut_extrude_6_sk1:
        with Locations((32.5, -52)):
            Rectangle(SKETCH_20_W, SKETCH_20_H)
    cut_extrude_6_tool1 = extrude(cut_extrude_6_sk1.sketch, amount=-CUT_EXTRUDE_6_REACH, mode=Mode.PRIVATE) & part.part
    # Эскиз20 → Вырез-Вытянуть6 (cut, up to next)
    with BuildSketch(Plane(origin=(0, 47, 0), x_dir=(1, 0, 0), z_dir=(0, 1, 0)), mode=Mode.PRIVATE) as cut_extrude_6_sk2:
        with Locations((227.5, -52)):
            Rectangle(SKETCH_20_W, SKETCH_20_H)
    cut_extrude_6_tool2 = extrude(cut_extrude_6_sk2.sketch, amount=-CUT_EXTRUDE_6_REACH, mode=Mode.PRIVATE) & part.part
    add(cut_extrude_6_tool1.solids().sort_by_distance((32.5, 47, 52))[0], mode=Mode.SUBTRACT)
    add(cut_extrude_6_tool2.solids().sort_by_distance((227.5, 47, 52))[0], mode=Mode.SUBTRACT)

    # Скругление2
    fillet_2_edges = [part.edges().sort_by_distance(p)[0] for p in [
        (15, 46, 67),
        (15, 46, 37),
        (50, 46, 37),
        (50, 46, 67),
        (210, 46, 67),
        (210, 46, 37),
        (245, 46, 37),
        (245, 46, 67),
    ]]
    fillet(fillet_2_edges, radius=FILLET_2_R)

    # Скругление3
    fillet_3_edges = [part.edges().sort_by_distance(p)[0] for p in [
        (90, 98.5, 1),
        (69, 98.5, 1),
        (191, 98.5, 1),
        (170, 98.5, 1),
    ]]
    fillet(fillet_3_edges, radius=FILLET_3_R)


solid = part.part
